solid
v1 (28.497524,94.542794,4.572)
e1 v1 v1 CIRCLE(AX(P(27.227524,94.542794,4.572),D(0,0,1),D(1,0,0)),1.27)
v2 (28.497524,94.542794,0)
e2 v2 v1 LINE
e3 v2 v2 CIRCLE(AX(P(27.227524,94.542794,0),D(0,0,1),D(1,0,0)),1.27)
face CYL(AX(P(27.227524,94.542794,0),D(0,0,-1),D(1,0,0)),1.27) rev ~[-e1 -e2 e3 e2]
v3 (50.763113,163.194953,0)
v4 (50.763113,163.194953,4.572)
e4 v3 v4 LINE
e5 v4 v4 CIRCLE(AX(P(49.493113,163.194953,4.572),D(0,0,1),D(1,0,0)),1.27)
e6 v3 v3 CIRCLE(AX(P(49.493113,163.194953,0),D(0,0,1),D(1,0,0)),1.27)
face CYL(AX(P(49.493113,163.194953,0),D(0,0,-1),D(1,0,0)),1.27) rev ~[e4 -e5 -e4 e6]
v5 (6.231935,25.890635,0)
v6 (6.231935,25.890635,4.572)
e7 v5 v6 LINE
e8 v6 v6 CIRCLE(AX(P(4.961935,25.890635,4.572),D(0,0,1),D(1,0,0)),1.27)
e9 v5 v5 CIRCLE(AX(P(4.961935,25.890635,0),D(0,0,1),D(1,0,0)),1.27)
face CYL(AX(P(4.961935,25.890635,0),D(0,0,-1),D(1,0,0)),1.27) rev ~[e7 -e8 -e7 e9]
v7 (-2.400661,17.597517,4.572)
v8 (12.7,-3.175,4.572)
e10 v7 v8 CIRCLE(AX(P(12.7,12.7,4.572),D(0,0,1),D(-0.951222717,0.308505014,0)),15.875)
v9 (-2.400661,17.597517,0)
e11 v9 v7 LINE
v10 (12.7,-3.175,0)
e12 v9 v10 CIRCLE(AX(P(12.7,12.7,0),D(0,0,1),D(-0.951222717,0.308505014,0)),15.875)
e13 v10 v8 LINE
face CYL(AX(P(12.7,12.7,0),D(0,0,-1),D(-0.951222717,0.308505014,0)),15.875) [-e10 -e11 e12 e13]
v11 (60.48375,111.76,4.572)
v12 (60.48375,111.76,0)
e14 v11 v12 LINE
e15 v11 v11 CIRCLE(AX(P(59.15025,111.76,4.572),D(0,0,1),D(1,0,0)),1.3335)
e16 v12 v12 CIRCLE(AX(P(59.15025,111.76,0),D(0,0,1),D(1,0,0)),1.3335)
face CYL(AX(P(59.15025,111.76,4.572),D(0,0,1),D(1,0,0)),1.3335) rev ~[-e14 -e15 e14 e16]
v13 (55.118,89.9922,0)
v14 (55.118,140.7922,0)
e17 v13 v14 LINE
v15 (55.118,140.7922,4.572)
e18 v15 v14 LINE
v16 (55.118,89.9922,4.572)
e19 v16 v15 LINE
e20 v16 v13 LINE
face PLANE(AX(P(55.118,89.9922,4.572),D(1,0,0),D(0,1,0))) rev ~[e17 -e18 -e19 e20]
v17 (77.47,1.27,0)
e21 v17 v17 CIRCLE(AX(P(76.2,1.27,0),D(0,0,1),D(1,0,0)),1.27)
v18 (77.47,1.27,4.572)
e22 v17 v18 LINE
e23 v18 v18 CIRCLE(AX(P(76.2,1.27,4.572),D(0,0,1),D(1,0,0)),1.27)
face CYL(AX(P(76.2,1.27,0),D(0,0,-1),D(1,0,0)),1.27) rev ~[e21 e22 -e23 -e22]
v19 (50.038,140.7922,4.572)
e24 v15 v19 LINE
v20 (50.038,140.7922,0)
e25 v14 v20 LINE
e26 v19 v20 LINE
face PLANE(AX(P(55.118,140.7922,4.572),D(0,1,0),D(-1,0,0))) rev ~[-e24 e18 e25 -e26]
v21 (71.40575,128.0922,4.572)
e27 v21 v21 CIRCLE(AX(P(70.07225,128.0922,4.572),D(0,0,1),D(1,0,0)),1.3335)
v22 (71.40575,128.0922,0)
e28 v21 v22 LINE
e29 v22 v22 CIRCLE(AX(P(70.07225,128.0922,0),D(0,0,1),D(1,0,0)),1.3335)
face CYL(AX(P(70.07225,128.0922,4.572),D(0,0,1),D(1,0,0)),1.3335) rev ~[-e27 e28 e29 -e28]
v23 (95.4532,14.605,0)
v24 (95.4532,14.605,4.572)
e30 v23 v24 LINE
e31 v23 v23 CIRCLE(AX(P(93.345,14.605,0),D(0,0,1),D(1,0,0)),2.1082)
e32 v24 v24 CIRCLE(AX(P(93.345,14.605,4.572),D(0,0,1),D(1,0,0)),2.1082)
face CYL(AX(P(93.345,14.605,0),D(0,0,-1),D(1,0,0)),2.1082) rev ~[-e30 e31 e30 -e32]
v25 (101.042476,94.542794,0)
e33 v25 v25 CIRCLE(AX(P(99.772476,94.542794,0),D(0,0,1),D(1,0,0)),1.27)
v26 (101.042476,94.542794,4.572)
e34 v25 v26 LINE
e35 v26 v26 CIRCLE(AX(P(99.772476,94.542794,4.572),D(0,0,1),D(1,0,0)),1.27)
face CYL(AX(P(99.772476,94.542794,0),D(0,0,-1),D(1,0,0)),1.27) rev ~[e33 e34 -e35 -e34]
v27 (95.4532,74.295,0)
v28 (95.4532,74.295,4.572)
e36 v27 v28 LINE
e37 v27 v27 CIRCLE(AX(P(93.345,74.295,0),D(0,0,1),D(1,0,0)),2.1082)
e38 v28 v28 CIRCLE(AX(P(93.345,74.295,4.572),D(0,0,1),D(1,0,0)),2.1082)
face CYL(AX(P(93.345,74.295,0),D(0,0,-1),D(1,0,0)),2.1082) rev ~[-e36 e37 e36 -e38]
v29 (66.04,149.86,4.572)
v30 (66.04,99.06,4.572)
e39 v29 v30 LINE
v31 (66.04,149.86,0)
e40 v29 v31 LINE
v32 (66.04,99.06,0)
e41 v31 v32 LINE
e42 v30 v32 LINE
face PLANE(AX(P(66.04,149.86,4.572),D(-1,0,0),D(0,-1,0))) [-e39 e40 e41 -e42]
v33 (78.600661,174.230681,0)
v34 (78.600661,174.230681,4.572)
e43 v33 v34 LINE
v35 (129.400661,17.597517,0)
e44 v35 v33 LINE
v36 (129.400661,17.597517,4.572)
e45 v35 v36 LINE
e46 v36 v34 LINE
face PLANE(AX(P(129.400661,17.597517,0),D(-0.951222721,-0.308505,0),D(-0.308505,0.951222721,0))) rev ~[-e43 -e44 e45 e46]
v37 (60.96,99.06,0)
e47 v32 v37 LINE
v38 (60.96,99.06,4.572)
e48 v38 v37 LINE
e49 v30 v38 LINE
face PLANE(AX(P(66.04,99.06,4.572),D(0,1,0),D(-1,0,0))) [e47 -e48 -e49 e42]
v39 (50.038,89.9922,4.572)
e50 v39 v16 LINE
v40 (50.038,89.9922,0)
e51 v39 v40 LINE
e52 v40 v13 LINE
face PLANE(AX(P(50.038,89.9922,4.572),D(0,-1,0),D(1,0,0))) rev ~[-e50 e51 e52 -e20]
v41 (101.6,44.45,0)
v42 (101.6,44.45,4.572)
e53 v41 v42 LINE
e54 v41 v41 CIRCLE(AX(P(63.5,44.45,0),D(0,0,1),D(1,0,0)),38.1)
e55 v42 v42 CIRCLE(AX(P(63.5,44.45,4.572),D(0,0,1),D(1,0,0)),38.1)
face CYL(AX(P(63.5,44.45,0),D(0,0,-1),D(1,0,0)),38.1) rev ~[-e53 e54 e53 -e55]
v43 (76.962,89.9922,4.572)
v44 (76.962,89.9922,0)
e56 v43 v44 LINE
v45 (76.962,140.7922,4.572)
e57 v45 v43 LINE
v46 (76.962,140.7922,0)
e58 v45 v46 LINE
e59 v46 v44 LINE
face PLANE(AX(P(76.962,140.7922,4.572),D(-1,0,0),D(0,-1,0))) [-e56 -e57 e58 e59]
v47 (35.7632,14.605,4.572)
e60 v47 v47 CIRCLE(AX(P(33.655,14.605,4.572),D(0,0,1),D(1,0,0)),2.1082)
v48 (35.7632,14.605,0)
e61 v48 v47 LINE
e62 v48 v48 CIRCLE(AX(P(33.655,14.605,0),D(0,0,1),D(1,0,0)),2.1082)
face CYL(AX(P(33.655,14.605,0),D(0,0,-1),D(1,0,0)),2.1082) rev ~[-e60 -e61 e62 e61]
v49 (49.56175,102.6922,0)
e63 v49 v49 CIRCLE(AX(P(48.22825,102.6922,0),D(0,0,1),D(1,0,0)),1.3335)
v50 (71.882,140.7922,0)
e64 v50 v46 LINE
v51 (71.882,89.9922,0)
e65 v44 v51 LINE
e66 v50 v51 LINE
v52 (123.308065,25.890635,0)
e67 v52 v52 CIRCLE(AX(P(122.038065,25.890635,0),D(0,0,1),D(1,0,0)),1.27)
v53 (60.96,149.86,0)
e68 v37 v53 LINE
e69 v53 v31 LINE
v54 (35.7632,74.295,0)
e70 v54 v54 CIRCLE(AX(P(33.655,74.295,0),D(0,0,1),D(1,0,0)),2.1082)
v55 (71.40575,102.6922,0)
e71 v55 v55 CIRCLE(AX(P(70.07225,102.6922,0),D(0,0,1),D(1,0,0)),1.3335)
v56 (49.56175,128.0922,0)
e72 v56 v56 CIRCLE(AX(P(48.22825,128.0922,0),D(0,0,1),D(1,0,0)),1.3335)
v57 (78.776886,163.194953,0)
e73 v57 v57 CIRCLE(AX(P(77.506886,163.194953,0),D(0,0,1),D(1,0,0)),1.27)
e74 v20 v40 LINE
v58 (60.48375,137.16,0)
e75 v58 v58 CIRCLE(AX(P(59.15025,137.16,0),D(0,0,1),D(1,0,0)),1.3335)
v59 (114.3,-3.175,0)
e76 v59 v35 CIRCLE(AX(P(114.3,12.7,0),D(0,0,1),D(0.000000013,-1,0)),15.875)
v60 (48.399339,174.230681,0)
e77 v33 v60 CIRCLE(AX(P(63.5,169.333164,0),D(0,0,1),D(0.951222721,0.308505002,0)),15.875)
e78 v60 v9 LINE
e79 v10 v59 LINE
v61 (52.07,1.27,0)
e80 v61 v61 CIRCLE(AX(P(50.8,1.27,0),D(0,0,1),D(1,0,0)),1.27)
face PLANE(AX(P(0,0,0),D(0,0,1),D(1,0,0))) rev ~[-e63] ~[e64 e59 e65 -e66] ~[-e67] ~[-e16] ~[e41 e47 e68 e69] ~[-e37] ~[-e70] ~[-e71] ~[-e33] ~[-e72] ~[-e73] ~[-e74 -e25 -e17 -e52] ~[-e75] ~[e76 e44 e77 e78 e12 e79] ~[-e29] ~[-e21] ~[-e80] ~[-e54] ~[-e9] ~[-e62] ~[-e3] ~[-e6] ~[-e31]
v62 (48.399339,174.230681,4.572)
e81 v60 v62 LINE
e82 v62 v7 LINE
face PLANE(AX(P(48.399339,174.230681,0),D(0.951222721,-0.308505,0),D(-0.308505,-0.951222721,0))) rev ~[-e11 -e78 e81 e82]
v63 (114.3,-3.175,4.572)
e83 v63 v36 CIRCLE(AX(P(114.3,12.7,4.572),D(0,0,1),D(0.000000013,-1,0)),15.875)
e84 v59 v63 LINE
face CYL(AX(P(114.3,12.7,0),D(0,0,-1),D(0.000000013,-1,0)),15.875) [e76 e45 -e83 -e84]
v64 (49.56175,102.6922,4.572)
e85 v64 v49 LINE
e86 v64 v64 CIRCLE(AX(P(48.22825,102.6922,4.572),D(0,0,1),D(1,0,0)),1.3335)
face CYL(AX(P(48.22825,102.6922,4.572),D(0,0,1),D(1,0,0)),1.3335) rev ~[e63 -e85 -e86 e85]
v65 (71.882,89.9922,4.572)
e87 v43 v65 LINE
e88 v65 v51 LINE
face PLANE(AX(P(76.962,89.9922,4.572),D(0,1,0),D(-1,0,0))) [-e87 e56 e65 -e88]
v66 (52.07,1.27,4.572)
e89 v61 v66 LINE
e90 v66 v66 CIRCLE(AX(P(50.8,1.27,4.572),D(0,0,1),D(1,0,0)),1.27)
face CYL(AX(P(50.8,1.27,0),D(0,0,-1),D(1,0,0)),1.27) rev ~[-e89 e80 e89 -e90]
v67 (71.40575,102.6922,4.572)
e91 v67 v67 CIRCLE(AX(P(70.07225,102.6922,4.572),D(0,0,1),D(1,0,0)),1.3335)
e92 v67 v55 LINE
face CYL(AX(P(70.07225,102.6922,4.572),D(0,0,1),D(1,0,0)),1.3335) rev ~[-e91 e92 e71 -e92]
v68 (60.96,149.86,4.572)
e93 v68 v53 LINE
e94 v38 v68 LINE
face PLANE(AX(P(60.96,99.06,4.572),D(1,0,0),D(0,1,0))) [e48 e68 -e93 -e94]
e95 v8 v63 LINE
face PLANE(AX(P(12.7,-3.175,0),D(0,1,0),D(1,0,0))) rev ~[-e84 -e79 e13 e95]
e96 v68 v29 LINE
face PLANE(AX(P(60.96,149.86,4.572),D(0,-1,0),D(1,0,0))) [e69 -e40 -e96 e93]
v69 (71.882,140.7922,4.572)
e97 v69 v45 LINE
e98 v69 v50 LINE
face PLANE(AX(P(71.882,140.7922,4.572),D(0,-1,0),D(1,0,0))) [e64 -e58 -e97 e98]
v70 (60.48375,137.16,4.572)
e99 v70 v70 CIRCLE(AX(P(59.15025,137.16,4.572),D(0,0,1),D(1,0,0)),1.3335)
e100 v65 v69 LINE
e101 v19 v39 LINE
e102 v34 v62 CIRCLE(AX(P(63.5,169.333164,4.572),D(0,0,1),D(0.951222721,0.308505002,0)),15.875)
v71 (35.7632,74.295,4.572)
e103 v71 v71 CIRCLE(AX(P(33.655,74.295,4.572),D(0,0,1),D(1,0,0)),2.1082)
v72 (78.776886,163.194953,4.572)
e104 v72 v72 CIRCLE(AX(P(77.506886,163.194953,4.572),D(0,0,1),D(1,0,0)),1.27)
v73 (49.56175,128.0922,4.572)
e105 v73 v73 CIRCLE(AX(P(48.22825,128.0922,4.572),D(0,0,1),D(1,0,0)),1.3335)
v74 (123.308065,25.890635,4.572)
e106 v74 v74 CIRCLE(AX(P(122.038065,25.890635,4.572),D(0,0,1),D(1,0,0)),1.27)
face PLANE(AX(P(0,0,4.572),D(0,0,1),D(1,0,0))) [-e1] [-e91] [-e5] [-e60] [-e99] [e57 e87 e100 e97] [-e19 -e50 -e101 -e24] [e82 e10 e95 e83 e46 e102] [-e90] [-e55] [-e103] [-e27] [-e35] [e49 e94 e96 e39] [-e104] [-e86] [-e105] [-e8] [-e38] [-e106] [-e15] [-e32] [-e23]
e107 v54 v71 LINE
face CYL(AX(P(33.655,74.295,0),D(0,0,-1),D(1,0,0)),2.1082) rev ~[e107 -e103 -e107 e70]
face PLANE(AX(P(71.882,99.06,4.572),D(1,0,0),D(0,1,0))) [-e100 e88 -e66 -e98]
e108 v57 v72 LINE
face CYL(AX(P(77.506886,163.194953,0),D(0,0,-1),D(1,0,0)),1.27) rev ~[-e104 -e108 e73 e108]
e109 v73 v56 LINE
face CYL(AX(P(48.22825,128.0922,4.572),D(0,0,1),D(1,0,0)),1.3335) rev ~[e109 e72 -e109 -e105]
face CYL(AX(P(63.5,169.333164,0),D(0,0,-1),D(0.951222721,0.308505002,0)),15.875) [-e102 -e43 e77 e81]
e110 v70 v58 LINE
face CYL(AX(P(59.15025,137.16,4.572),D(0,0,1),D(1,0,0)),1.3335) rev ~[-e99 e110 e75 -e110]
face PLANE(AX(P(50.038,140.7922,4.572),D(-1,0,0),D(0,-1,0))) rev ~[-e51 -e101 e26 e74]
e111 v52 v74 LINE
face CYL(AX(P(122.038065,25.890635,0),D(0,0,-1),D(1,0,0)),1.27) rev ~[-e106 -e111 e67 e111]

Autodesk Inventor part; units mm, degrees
ref_plane "YZ Plane" through (0, 0, 0) normal (1, 0, 0) x (0, 1, 0)
ref_plane "XZ Plane" through (0, 0, 0) normal (0, 1, 0) x (-1, 0, 0)
ref_plane "XY Plane" through (0, 0, 0) normal (0, 0, 1) x (1, 0, 0)
sketch "Sketch1" plane through (0, 0, 0) normal (0, 0, 1) x (1, 0, 0)
  line L0 (63.5, 50.8) -> (63.5, 44.45)
  circle A0 centre (63.5, 44.45) radius 38.1
  circle A1 centre (33.655, 74.295) radius 2.1082
  circle A2 centre (93.345, 74.295) radius 2.1082
  circle A3 centre (93.345, 14.605) radius 2.1082
  circle A4 centre (33.655, 14.605) radius 2.1082
  line L1 (63.5, 82.55) -> (63.5, 86.36)
  line L2 (63.5, 86.36) -> (82.55, 86.36)
  line L3 (63.5, 86.36) -> (44.45, 86.36)
  line L4 (82.55, 86.36) -> (82.55, 134.62)
  line L5 (44.45, 86.36) -> (44.45, 134.62)
  arc A5 (82.55, 134.62) -> (44.45, 134.62) centre (63.5, 134.62) ccw
  arc A6 (-2.400661, 17.597517) -> (12.7, -3.175) centre (12.7, 12.7) ccw
  arc A7 (114.3, -3.175) -> (129.400661, 17.597517) centre (114.3, 12.7) ccw
  line L6 (114.3, -3.175) -> (12.7, -3.175)
  line L7 (48.399339, 174.230681) -> (-2.400661, 17.597517)
  line L8 (129.400661, 17.597517) -> (78.600661, 174.230681)
  arc A8 (78.600661, 174.230681) -> (48.399339, 174.230681) centre (63.5, 169.333164) ccw
  arc A9 (75.580529, 173.251177) -> (51.419471, 173.251177) centre (63.5, 169.333164) ccw
  arc A10 (0.619471, 16.618013) -> (12.7, 0) centre (12.7, 12.7) ccw
  arc A11 (114.3, 0) -> (126.380529, 16.618013) centre (114.3, 12.7) ccw
  line L9 (12.7, 0) -> (114.3, 0)
  line L10 (0.619471, 16.618013) -> (51.419471, 173.251177)
  line L11 (75.580529, 173.251177) -> (126.380529, 16.618013)
  line L12 (0.619471, 16.618013) -> (3.753882, 26.282436)
  line L13 (3.753882, 26.282436) -> (4.961935, 25.890635)
  circle A12 centre (4.961935, 25.890635) radius 1.27
  line L14 (51.419471, 173.251177) -> (48.285061, 163.586755)
  line L15 (48.285061, 163.586755) -> (49.493113, 163.194953)
  circle A13 centre (49.493113, 163.194953) radius 1.27
  circle A14 centre (27.227524, 94.542794) radius 1.27
  line L16 (75.580529, 173.251177) -> (78.714939, 163.586755)
  line L17 (78.714939, 163.586755) -> (77.506886, 163.194953)
  circle A15 centre (77.506886, 163.194953) radius 1.27
  line L18 (126.380529, 16.618013) -> (123.246118, 26.282436)
  line L19 (123.246118, 26.282436) -> (122.038065, 25.890635)
  circle A16 centre (122.038065, 25.890635) radius 1.27
  circle A17 centre (99.772476, 94.542794) radius 1.27
  line L20 (12.7, 0) -> (16.51, 0)
  line L21 (18.621315, -3.175) -> (18.621315, 1.27) construction
  line L22 (45.72, 1.27) -> (50.8, 1.27) construction
  line L23 (12.7, 0.808162) -> (16.51, 0.808162) construction
  circle A18 centre (50.8, 1.27) radius 1.27
  line L24 (109.391635, -3.175) -> (109.391635, 1.27) construction
  line L25 (81.28, 1.27) -> (76.2, 1.27) construction
  line L26 (114.432893, 0.578481) -> (110.622893, 0.578481) construction
  circle A19 centre (76.2, 1.27) radius 1.27
  point P0 (0, 0)
  point P1 (0, 0)
  dimension "d13" = 76.2
  dimension "d42" = 2.54
  dimension "d45" = 2.54
  dimension "d12" = 6.35
  dimension "d14" = 4.2164
  dimension "d15" = 4.2164
  dimension "d16" = 4.2164
  dimension "d17" = 4.2164
  dimension "d18" = 3.81
  dimension "d19" = 19.05
  dimension "d20" = 19.05
  dimension "d21" = 48.26
  dimension "d22" = 48.26
  dimension "d26" = 31.75
  dimension "d27" = 31.75
  dimension "d30" = 25.4
  dimension "d31" = 25.4
  dimension "d32" = 25.4
  dimension "d33" = 10.16
  dimension "d34" = 10.16
  dimension "d35" = 1.27
  dimension "d37" = 1.27
  dimension "d40" = 10.16
  dimension "d41" = 10.16
  dimension "d43" = 2.54
  dimension "d44" = 2.54
  dimension "d221" = 4.445
  dimension "d222" = 5.08
  dimension "d224" = 5.08
  dimension "d225" = 3.81
  dimension "d228" = 38.1
  dimension "d229" = 38.1
sketch "Sketch1 outline for Extrusion3" plane through (0, 0, 0) normal (0, 0, 1) x (1, 0, 0)
  arc A0 (78.600661, 174.230681) -> (48.399339, 174.230681) centre (63.5, 169.333164) ccw
  line L0 (129.400661, 17.597517) -> (78.600661, 174.230681)
  line L1 (48.399339, 174.230681) -> (-2.400661, 17.597517)
  arc A1 (114.3, -3.175) -> (129.400661, 17.597517) centre (114.3, 12.7) ccw
  arc A2 (-2.400661, 17.597517) -> (12.7, -3.175) centre (12.7, 12.7) ccw
  line L2 (12.7, -3.175) -> (114.3, -3.175)
  circle A3 centre (4.961935, 25.890635) radius 1.27
  circle A4 centre (33.655, 14.605) radius 2.1082
  circle A5 centre (33.655, 74.295) radius 2.1082
  circle A6 centre (93.345, 14.605) radius 2.1082
  circle A7 centre (63.5, 44.45) radius 38.1
  circle A8 centre (122.038065, 25.890635) radius 1.27
  circle A9 centre (93.345, 74.295) radius 2.1082
  circle A10 centre (27.227524, 94.542794) radius 1.27
  circle A11 centre (49.493113, 163.194953) radius 1.27
  line L3 (44.45, 86.36) -> (63.5, 86.36)
  line L4 (63.5, 86.36) -> (82.55, 86.36)
  line L5 (82.55, 86.36) -> (82.55, 134.62)
  arc A12 (82.55, 134.62) -> (44.45, 134.62) centre (63.5, 134.62) ccw
  line L6 (44.45, 134.62) -> (44.45, 86.36)
  circle A13 centre (99.772476, 94.542794) radius 1.27
  circle A14 centre (77.506886, 163.194953) radius 1.27
extrude "Extrusion3" add sketch "Sketch1 outline for Extrusion3" along normal blind 4.572
sketch "Sketch2" plane through (0, 0, 4.572) normal (0, 0, 1) x (1, 0, 0)
  line L0 (44.45, 86.36) -> (82.55, 86.36)
  line L1 (63.5, 86.36) -> (44.45, 86.36)
  line L2 (63.5, 86.36) -> (82.55, 86.36)
  line L3 (53.975, 86.36) -> (63.5, 86.36)
  line L4 (63.5, 86.36) -> (73.025, 86.36)
  line L5 (82.55, 134.62) -> (82.55, 86.36)
  line L6 (71.882, 140.7922) -> (76.962, 140.7922)
  line L7 (76.962, 140.7922) -> (76.962, 89.9922)
  line L8 (76.962, 89.9922) -> (71.882, 89.9922)
  line L9 (71.882, 89.9922) -> (71.882, 140.7922)
  circle A0 centre (70.07225, 128.0922) radius 1.3335
  circle A1 centre (70.07225, 102.6922) radius 1.3335
  line L10 (50.038, 89.9922) -> (55.118, 89.9922)
  line L11 (55.118, 89.9922) -> (55.118, 140.7922)
  line L12 (55.118, 140.7922) -> (50.038, 140.7922)
  line L13 (50.038, 140.7922) -> (50.038, 89.9922)
  line L14 (44.45, 86.36) -> (44.45, 134.62)
  circle A2 centre (48.22825, 128.0922) radius 1.3335
  circle A3 centre (48.22825, 102.6922) radius 1.3335
  line L15 (71.882, 99.06) -> (68.73875, 99.06)
  line L16 (66.04, 99.06) -> (60.96, 99.06)
  line L17 (60.96, 99.06) -> (60.96, 149.86)
  line L18 (60.96, 149.86) -> (66.04, 149.86)
  line L19 (66.04, 149.86) -> (66.04, 99.06)
  circle A4 centre (59.15025, 111.76) radius 1.3335
  circle A5 centre (59.15025, 137.16) radius 1.3335
  arc A6 (82.55, 134.62) -> (44.45, 134.62) centre (63.5, 134.62) ccw
  line L20 (44.45, 134.62) -> (44.45, 86.36)
  point P0 (0, 0)
  dimension "d183" = 5.08
  dimension "d184" = 50.8
  dimension "d185" = 3.6322
  dimension "d186" = 5.588
  dimension "d189" = 2.667
  dimension "d194" = 5.08
  dimension "d196" = 3.6322
  dimension "d197" = 5.588
  dimension "d198" = 50.8
  dimension "d199" = 1.80975
  dimension "d203" = 2.667
  dimension "d204" = 2.667
  dimension "d205" = 1.80975
  dimension "d207" = 41.7322
  dimension "d208" = 16.3322
  dimension "d209" = 1.80975
  dimension "d211" = 5.08
  dimension "d212" = 50.8
  dimension "d216" = 2.667
  dimension "d217" = 2.667
extrude "Extrusion11" add sketch "Sketch2" against normal blind 4.572
sketch "Sketch3" plane through (0, 0, 4.572) normal (0, 0, 1) x (1, 0, 0)
  point P0 (0, 0)
sketch "Sketch1 outline for Extrusion12" plane through (0, 0, 0) normal (0, 0, 1) x (1, 0, 0)
  circle A0 centre (50.8, 1.27) radius 1.27
  circle A1 centre (76.2, 1.27) radius 1.27
extrude "Extrusion12" cut sketch "Sketch1 outline for Extrusion12" along normal blind 4.572
properties part number "Nathan_LED_Speaker_Front"
